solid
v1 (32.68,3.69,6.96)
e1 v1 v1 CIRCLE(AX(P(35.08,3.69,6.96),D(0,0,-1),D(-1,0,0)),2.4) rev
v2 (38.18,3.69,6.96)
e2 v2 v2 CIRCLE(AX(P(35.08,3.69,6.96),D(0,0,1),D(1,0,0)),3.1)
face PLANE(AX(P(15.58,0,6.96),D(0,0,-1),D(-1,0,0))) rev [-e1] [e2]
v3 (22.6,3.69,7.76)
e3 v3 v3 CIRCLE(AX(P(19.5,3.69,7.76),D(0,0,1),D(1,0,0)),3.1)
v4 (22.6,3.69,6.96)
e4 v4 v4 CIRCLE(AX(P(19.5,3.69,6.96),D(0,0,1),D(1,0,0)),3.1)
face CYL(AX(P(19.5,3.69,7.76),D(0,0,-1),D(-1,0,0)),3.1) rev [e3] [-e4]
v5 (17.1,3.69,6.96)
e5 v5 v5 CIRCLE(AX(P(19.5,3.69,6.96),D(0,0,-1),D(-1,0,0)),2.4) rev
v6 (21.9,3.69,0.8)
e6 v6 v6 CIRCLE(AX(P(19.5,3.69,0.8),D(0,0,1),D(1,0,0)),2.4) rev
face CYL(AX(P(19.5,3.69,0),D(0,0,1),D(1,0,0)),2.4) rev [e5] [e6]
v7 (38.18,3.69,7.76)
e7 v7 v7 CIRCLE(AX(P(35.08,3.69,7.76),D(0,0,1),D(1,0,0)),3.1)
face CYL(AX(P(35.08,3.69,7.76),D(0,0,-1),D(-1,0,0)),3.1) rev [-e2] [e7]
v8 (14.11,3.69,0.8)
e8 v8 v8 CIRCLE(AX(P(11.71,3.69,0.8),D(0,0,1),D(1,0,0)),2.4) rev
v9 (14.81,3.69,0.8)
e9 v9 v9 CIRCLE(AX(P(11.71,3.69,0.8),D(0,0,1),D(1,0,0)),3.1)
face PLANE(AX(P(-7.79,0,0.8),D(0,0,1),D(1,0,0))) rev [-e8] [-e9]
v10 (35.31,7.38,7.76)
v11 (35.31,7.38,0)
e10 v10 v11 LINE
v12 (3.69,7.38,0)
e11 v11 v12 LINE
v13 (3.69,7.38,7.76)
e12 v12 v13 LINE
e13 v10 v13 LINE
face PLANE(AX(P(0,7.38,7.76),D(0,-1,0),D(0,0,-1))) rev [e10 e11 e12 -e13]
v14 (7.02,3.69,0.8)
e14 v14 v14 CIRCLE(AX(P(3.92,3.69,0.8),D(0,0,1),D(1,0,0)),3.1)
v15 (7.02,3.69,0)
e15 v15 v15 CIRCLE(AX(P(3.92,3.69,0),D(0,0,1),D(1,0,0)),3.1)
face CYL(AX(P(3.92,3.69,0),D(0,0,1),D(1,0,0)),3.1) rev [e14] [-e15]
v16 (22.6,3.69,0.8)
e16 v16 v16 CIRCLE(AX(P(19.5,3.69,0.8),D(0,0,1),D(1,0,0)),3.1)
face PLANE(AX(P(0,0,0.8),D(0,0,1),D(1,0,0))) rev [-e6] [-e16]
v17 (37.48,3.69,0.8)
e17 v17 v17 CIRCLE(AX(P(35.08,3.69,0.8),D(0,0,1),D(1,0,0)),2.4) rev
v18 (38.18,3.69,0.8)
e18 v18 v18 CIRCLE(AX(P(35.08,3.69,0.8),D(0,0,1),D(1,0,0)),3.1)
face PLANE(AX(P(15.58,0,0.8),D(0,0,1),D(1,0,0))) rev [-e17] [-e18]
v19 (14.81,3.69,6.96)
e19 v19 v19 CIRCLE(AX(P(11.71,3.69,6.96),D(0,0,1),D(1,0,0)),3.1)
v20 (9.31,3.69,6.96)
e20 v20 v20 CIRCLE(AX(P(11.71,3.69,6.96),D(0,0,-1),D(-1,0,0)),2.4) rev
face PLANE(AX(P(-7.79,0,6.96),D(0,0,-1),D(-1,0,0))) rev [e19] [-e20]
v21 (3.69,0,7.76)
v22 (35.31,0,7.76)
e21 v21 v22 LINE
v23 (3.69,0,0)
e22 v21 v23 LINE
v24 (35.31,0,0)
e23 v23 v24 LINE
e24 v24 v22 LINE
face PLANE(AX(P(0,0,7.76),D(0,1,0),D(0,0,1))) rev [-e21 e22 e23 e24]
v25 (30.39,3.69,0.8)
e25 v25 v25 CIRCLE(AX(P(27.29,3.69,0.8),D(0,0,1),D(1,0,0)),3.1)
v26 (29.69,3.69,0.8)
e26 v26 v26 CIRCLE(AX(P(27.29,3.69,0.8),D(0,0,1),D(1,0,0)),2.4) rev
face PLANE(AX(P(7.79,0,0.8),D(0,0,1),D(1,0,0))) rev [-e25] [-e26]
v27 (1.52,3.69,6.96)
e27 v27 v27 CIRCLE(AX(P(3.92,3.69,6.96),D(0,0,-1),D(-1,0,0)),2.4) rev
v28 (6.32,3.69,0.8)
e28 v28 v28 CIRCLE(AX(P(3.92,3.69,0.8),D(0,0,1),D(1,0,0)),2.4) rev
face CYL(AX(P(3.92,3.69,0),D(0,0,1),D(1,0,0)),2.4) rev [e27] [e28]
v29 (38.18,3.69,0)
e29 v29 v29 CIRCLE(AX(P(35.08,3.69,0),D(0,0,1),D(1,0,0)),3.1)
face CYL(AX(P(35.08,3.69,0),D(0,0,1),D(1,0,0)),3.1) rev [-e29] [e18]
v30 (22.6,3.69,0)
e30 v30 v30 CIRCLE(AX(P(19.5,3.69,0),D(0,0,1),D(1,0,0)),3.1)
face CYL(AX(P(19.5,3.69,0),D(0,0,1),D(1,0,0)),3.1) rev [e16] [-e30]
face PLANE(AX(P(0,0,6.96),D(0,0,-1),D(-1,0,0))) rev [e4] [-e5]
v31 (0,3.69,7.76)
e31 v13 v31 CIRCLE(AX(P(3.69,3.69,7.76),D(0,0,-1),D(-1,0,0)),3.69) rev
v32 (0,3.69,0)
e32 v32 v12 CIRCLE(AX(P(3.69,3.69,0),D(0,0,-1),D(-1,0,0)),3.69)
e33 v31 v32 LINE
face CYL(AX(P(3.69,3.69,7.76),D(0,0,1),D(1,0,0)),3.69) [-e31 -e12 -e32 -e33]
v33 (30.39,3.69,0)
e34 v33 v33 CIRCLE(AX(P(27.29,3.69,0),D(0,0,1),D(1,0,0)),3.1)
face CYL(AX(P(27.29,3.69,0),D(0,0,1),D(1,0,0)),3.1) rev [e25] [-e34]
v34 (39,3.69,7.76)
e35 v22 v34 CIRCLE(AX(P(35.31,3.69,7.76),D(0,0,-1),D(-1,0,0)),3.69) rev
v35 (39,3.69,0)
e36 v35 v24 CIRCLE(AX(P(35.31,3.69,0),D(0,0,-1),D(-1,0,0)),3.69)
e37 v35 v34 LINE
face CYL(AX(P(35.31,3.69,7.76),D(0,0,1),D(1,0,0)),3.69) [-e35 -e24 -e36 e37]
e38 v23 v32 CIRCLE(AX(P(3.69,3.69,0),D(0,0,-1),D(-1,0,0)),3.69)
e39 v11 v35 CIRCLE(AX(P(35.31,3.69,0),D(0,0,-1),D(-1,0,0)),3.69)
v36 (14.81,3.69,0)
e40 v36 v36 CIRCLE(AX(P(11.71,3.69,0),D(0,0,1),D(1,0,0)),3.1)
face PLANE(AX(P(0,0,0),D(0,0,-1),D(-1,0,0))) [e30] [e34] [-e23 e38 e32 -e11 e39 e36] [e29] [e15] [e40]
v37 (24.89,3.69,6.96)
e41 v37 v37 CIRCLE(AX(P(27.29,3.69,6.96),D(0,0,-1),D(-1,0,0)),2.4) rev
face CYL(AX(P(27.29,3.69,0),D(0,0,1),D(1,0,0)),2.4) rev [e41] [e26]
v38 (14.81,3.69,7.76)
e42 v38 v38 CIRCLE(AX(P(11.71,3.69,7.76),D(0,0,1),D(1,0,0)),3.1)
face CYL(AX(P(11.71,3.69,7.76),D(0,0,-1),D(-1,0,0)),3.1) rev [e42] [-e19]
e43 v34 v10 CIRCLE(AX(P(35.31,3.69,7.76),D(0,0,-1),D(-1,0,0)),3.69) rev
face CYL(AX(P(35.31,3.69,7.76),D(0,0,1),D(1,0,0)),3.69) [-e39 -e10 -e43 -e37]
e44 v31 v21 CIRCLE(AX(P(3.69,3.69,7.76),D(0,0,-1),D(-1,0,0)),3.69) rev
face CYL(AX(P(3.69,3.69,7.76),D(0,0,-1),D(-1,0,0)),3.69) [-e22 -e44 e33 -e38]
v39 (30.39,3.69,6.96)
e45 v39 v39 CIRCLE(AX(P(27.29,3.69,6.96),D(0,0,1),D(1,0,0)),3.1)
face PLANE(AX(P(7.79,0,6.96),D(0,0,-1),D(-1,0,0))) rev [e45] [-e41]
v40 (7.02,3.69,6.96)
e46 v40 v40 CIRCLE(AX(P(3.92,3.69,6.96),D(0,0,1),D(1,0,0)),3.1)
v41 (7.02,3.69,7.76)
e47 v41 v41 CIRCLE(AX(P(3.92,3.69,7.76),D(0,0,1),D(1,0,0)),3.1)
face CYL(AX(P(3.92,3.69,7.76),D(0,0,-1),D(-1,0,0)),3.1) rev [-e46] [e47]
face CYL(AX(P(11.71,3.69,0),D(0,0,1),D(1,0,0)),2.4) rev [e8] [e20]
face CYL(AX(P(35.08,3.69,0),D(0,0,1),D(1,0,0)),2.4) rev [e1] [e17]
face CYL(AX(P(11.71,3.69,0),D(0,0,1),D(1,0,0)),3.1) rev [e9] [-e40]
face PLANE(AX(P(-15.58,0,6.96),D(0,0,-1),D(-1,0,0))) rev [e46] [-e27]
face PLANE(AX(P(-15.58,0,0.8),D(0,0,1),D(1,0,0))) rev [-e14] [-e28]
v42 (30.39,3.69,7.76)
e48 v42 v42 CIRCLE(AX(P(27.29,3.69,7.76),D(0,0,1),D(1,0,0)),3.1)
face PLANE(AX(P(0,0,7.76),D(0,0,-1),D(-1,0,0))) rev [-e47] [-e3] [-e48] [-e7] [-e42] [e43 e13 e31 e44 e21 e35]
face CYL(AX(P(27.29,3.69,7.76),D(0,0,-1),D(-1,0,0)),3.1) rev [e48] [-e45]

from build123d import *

# Parameters (mm, degrees)
SKETCH1_W                = 39
SKETCH1_H                = 7.38
BOSS_EXTRUDE1_DEPTH      = 7.76
SKETCH2_R                = 2.4
CUT_EXTRUDE1_DEPTH       = 7.76
CUT_EXTRUDE2_OUTLINE_R   = 3.1
CUT_EXTRUDE2_OUTLINE_R_2 = 2.4
CUT_EXTRUDE2_DEPTH       = 0.8
CUT_EXTRUDE3_START       = 6.96
CUT_EXTRUDE3_OUTLINE_R   = 3.1
CUT_EXTRUDE3_OUTLINE_R_2 = 2.4
CUT_EXTRUDE3_DEPTH       = 0.8
LPATTERN3_COUNT          = 3
LPATTERN3_PITCH          = 7.79
LPATTERN6_COUNT          = 3
LPATTERN6_PITCH          = 7.79
FILLET1_R                = 3.69
FILLET2_R                = 3.69
FILLET3_R                = 3.69
FILLET4_R                = 3.69


# Read off the part's stored shape, not the designer's step: Cut-Extrude2, Cut-Extrude3
with BuildPart() as part:
    # Sketch1 → Boss-Extrude1 (new body)
    with BuildSketch(Plane.XY):
        with Locations((19.5, 3.69)):
            Rectangle(SKETCH1_W, SKETCH1_H)
    extrude(amount=BOSS_EXTRUDE1_DEPTH)

    # Sketch2 → Cut-Extrude1 (cut)
    with BuildSketch(Plane.XY.offset(7.76)):
        with Locations((19.5, 3.69)):
            Circle(SKETCH2_R)
    cut_extrude1 = extrude(amount=-CUT_EXTRUDE1_DEPTH, mode=Mode.SUBTRACT)

    # Cut-Extrude2 outline → Cut-Extrude2 (cut)
    with BuildSketch(Plane.XY):
        with Locations((19.5, 3.69)):
            Circle(CUT_EXTRUDE2_OUTLINE_R)
        with Locations((19.5, 3.69)):
            Circle(CUT_EXTRUDE2_OUTLINE_R_2, mode=Mode.SUBTRACT)
    cut_extrude2 = extrude(amount=CUT_EXTRUDE2_DEPTH, mode=Mode.SUBTRACT)

    # Cut-Extrude3 outline → Cut-Extrude3 (cut)
    with BuildSketch(Plane.XY.offset(CUT_EXTRUDE3_START)):
        with Locations((19.5, 3.69)):
            Circle(CUT_EXTRUDE3_OUTLINE_R)
        with Locations((19.5, 3.69)):
            Circle(CUT_EXTRUDE3_OUTLINE_R_2, mode=Mode.SUBTRACT)
    cut_extrude3 = extrude(amount=CUT_EXTRUDE3_DEPTH, mode=Mode.SUBTRACT)

    # LPattern3: Cut-Extrude1, Cut-Extrude2, Cut-Extrude3 ×3
    with Locations(*[(-i * LPATTERN3_PITCH, 0, 0) for i in range(1, LPATTERN3_COUNT)]):
        add(cut_extrude1, mode=Mode.SUBTRACT)
        add(cut_extrude2, mode=Mode.SUBTRACT)
        add(cut_extrude3, mode=Mode.SUBTRACT)

    # LPattern6: Cut-Extrude1, Cut-Extrude2, Cut-Extrude3 ×3
    with Locations(*[(i * LPATTERN6_PITCH, 0, 0) for i in range(1, LPATTERN6_COUNT)]):
        add(cut_extrude1, mode=Mode.SUBTRACT)
        add(cut_extrude2, mode=Mode.SUBTRACT)
        add(cut_extrude3, mode=Mode.SUBTRACT)

    # Fillet1
    fillet1_edges = [part.edges().sort_by_distance(p)[0] for p in [
        (0, 7.38, 3.88),
    ]]
    fillet(fillet1_edges, radius=FILLET1_R)

    # Fillet2
    fillet2_edges = [part.edges().sort_by_distance(p)[0] for p in [
        (0, 0, 3.88),
    ]]
    fillet(fillet2_edges, radius=FILLET2_R - 0.0001)  # a hair under: the kernel refuses the full size

    # Fillet3
    fillet3_edges = [part.edges().sort_by_distance(p)[0] for p in [
        (39, 7.38, 3.88),
    ]]
    fillet(fillet3_edges, radius=FILLET3_R)

    # Fillet4
    fillet4_edges = [part.edges().sort_by_distance(p)[0] for p in [
        (39, 0, 3.88),
    ]]
    fillet(fillet4_edges, radius=FILLET4_R - 0.0001)  # a hair under: the kernel refuses the full size


solid = part.part
